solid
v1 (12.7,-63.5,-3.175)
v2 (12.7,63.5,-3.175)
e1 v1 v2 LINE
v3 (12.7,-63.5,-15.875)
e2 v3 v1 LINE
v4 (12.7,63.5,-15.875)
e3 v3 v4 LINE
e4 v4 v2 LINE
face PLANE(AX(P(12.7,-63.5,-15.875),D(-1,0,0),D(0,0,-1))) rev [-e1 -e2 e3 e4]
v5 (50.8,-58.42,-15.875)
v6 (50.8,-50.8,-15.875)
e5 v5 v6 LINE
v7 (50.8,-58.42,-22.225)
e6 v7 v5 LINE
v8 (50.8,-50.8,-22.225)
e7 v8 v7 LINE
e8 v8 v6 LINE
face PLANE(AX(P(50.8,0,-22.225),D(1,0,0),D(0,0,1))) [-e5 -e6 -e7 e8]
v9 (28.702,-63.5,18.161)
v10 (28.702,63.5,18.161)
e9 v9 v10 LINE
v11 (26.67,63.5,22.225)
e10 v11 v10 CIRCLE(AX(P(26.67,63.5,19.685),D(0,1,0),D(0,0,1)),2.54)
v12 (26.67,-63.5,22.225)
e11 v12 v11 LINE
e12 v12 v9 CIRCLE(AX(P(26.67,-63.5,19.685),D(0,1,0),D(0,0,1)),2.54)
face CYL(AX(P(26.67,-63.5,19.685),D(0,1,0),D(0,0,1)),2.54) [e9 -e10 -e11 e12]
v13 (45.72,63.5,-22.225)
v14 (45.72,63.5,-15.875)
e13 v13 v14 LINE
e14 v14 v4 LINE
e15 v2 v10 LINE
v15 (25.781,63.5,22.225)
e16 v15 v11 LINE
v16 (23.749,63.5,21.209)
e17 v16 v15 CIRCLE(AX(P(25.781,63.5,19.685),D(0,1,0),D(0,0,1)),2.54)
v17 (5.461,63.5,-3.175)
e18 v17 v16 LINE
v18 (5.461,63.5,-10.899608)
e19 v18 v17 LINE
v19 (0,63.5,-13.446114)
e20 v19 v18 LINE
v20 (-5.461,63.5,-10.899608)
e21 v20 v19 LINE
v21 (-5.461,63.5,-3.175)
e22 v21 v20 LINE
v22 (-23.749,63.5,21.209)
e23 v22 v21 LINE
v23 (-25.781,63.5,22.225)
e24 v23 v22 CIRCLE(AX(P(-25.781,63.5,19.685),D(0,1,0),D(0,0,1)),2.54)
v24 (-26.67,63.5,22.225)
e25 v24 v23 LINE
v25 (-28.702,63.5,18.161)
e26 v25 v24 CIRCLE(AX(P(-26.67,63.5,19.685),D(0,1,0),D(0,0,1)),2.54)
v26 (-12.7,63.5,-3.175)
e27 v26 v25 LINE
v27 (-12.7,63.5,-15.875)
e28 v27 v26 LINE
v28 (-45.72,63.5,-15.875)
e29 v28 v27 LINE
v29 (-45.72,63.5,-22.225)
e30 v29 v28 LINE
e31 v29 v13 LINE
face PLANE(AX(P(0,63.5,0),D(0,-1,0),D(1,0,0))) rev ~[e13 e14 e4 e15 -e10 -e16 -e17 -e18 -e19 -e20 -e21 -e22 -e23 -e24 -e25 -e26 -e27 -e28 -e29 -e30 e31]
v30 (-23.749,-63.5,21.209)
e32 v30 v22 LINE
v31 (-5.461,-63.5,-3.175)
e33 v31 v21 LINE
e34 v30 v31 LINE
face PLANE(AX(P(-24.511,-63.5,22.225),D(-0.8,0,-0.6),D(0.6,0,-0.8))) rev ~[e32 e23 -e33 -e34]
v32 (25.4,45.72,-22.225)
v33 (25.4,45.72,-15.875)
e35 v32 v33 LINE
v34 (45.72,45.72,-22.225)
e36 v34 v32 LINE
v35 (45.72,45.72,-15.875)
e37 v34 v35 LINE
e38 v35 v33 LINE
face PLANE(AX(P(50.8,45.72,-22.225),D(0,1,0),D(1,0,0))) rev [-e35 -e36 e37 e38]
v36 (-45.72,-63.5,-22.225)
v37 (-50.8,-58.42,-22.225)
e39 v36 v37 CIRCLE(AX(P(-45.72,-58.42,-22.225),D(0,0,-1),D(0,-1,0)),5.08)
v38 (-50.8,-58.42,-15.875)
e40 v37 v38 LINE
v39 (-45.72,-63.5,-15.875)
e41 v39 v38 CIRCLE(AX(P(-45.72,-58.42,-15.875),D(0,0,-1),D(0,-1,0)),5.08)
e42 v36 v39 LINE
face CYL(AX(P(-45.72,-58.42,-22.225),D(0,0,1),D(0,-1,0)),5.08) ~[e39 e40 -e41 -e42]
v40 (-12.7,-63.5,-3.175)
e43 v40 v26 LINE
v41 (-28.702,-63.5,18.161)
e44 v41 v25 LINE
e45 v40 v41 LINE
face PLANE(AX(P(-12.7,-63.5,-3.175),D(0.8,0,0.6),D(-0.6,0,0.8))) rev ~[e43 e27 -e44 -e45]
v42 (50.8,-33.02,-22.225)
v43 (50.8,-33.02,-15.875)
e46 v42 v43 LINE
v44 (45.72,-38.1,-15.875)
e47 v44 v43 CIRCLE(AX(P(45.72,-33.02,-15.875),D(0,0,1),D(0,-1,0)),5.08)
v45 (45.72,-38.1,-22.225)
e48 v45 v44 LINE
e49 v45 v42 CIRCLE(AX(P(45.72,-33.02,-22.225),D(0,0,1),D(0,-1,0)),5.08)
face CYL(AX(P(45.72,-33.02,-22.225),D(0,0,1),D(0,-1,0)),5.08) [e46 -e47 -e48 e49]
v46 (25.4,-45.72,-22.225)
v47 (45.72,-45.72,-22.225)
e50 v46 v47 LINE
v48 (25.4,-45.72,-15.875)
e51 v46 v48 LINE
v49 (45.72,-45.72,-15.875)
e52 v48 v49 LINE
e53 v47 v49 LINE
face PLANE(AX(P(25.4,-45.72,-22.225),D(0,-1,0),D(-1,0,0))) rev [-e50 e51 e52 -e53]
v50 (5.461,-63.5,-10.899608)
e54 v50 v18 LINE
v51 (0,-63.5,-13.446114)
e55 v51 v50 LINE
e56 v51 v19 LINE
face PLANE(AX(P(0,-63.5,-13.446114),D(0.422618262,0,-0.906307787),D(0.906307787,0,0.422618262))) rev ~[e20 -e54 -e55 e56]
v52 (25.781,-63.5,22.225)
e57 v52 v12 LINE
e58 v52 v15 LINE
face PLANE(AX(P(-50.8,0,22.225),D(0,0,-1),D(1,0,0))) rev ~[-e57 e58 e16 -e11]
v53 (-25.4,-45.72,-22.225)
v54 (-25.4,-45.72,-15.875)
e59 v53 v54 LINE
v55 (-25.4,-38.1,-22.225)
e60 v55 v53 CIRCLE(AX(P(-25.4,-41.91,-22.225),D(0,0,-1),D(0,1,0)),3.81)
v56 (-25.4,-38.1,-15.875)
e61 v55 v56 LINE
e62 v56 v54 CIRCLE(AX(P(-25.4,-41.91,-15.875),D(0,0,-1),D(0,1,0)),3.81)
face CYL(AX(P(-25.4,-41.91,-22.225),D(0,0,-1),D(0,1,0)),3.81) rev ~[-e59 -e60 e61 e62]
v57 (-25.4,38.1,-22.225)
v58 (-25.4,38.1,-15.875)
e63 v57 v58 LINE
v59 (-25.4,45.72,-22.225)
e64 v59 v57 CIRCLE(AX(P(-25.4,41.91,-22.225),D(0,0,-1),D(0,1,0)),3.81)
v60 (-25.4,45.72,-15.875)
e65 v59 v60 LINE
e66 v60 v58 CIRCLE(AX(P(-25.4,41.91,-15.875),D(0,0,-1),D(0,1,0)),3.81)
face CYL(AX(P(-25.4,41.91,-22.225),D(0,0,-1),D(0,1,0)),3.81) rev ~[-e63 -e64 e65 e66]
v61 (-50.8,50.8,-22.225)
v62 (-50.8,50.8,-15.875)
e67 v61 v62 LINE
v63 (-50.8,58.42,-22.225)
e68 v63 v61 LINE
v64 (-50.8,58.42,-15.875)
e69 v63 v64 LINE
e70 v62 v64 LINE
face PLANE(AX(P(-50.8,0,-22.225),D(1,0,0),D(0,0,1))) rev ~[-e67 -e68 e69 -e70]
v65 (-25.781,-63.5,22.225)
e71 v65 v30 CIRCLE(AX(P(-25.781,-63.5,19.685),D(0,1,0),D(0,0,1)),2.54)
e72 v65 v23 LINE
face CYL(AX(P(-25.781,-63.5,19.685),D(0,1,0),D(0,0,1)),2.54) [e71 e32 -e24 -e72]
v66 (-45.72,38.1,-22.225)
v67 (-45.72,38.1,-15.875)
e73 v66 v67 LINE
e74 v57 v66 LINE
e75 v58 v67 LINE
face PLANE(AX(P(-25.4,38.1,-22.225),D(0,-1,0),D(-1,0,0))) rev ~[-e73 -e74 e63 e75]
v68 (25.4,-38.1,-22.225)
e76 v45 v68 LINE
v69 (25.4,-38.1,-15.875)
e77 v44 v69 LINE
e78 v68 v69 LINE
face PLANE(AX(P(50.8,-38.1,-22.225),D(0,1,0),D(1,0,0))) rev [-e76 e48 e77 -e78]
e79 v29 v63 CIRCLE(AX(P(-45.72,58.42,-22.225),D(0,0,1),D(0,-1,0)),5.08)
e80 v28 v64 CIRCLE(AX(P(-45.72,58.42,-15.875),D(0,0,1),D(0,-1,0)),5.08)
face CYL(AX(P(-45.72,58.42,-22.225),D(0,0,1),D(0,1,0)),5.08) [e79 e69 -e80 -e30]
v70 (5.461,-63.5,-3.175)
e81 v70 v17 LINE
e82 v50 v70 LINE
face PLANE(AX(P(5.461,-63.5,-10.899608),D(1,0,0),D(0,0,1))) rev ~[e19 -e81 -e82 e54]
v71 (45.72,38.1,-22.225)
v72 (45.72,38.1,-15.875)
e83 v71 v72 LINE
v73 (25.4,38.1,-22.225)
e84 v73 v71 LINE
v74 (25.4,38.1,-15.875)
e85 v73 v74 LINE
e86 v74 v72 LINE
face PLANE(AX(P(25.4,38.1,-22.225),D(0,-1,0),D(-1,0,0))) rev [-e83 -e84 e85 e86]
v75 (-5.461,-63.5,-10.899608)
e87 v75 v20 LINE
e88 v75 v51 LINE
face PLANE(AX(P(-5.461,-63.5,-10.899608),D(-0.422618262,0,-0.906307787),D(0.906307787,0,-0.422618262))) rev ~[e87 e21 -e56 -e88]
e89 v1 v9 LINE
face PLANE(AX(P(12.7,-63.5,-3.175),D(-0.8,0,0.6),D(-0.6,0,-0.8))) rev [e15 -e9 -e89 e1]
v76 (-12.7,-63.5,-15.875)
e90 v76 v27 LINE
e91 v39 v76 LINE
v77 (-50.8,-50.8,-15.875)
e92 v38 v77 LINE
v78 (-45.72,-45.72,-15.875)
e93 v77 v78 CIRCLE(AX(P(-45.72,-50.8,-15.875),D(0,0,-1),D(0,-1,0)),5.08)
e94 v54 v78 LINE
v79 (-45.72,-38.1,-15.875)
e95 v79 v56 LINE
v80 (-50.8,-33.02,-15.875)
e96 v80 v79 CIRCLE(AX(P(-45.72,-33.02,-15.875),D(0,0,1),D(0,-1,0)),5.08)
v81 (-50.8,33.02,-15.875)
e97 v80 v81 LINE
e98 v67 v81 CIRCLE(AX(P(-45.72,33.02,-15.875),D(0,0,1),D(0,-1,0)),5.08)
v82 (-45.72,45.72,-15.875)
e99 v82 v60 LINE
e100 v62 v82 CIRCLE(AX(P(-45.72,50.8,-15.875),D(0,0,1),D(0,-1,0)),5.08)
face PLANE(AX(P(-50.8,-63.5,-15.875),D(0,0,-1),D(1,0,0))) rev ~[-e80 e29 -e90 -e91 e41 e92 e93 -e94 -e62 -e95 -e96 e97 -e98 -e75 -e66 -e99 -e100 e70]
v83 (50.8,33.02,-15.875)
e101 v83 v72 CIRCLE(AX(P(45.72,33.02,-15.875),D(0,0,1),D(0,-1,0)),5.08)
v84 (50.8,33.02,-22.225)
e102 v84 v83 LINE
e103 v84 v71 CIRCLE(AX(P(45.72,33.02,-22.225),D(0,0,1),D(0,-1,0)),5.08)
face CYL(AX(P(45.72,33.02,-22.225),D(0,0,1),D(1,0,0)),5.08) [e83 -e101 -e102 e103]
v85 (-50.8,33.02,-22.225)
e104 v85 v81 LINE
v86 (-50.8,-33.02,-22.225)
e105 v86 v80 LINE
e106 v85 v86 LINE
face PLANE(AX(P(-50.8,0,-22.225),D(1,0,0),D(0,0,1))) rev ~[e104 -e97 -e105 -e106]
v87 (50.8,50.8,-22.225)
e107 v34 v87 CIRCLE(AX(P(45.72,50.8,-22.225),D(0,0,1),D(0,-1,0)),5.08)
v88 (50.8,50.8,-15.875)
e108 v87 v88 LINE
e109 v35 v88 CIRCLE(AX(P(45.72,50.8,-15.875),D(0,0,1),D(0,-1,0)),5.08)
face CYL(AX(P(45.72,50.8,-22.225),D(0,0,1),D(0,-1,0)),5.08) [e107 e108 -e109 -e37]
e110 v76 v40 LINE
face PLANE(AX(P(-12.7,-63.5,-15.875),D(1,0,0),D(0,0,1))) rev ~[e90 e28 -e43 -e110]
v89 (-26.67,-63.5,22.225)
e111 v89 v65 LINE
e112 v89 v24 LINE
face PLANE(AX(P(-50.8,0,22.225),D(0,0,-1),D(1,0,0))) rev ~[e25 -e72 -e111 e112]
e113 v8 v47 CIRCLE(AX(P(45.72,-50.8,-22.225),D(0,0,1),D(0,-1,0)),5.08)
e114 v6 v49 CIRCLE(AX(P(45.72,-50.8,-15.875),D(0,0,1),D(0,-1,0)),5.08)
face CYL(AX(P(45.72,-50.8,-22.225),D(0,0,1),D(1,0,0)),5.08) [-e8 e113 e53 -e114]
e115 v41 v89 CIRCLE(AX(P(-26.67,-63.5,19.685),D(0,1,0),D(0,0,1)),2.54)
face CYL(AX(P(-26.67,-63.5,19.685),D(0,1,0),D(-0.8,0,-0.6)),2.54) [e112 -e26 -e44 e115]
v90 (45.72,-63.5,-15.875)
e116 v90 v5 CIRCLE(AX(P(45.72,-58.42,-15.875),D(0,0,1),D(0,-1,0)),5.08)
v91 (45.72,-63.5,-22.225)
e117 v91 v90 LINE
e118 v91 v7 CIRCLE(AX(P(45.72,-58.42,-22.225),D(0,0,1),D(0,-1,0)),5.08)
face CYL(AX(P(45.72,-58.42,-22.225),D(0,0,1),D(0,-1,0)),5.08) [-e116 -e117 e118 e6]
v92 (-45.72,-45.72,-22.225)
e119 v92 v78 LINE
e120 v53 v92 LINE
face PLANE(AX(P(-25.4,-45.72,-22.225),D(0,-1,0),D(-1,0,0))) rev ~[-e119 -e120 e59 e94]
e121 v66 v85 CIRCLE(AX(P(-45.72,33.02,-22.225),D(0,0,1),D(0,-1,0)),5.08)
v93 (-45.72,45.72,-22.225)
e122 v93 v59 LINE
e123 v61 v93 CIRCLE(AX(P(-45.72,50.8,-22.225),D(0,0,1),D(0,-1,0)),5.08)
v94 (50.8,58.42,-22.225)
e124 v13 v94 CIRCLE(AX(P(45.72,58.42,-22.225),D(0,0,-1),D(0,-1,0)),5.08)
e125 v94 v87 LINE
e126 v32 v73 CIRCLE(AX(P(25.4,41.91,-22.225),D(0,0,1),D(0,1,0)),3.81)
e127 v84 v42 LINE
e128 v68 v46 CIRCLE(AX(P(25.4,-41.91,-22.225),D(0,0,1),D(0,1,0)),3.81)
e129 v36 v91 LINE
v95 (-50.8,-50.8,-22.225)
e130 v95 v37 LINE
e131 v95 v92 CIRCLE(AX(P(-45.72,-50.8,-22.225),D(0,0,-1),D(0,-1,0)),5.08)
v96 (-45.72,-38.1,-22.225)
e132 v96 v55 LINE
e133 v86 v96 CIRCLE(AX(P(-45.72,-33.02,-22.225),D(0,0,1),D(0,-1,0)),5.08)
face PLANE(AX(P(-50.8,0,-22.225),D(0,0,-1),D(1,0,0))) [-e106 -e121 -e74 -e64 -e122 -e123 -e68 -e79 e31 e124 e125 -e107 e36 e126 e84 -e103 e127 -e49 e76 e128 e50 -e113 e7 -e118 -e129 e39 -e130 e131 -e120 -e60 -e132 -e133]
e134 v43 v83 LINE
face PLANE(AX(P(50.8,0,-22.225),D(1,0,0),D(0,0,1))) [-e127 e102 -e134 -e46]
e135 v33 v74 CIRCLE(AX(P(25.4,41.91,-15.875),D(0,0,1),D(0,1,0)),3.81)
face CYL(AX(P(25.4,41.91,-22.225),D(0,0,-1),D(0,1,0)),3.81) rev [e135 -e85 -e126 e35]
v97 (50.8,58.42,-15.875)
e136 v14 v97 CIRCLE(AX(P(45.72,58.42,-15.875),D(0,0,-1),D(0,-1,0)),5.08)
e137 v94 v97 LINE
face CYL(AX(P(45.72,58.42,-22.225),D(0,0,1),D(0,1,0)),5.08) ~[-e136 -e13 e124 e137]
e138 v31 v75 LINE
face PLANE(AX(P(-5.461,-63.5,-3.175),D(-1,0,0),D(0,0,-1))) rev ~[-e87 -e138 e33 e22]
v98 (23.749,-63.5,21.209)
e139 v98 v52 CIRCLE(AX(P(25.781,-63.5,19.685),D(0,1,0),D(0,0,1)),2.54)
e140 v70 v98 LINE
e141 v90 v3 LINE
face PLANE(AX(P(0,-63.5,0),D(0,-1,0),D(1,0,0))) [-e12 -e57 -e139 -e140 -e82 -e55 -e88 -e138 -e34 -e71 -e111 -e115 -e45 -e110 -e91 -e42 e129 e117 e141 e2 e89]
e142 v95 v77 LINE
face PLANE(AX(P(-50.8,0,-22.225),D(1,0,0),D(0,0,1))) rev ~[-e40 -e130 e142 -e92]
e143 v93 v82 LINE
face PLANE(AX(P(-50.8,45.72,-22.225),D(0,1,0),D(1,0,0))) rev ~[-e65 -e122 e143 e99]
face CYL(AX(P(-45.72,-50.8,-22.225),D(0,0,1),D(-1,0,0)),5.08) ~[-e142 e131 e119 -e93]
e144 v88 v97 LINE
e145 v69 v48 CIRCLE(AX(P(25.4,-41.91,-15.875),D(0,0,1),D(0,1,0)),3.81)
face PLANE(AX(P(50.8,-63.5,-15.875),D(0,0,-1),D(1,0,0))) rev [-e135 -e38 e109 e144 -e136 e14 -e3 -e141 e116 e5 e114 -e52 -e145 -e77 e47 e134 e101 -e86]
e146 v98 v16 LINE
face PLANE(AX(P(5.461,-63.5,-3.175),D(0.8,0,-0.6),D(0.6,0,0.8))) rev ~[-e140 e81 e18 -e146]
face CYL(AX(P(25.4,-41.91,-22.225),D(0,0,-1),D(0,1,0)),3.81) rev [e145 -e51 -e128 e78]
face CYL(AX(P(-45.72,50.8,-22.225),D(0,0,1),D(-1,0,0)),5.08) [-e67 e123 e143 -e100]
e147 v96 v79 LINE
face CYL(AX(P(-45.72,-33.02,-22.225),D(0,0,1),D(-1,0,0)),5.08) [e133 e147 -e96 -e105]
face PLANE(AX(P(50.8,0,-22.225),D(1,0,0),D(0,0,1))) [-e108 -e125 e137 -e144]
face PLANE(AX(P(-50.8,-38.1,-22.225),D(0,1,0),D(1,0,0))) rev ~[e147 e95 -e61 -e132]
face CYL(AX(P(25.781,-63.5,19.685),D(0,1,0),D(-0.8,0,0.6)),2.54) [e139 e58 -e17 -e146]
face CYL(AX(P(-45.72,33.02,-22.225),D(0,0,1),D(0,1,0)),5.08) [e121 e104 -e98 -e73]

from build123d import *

# Parameters (mm, degrees)
F0_W     = 101.6
F0_H     = 44.45
F1_DEPTH = 63.5
F3_DEPTH = 127.001
F5_DEPTH = 127.001
F6_R     = 2.54
F8_DEPTH = 6.35
F9_R     = 5.08


# Not quite as in the source:
# - a pattern or mirror of a feature is missing from the dataset's text; its kind, count and spacing are read off the source's solid


with BuildPart() as f1:
    # F0 (on Front) → F1 (new body, symmetric)
    with BuildSketch(Plane.XZ):
        Rectangle(F0_W, F0_H)
    extrude(amount=F1_DEPTH, both=True)

    # F2 (on face) → F3 (cut, through all)
    with BuildSketch(Plane.XZ.offset(63.5)):
        Polygon((-50.8, -15.875), (-12.7, -15.875), (-12.7, -3.175), (-31.75, 22.225), (-50.8, 22.225), align=None)
    f3 = extrude(amount=-F3_DEPTH, mode=Mode.SUBTRACT)

    # F3_copies: F3 across plane
    add(f3.mirror(Plane(origin=(0, 0, 0), x_dir=(0, 0, 1), z_dir=(1, 0, 0))), mode=Mode.SUBTRACT)

    # F4 (on face) → F5 (cut, through all)
    with BuildSketch(Plane.XZ.offset(63.5)):
        Polygon((24.511, 22.225), (-24.511, 22.225), (-5.461, -3.175), (-5.461, -10.8996083293), (0, -13.4461144505), (5.461, -10.8996083293), (5.461, -3.175), align=None)
    extrude(amount=-F5_DEPTH, mode=Mode.SUBTRACT)

    # F6
    f6_edges = [f1.edges().sort_by_distance(p)[0] for p in [
        (-31.75, 0, 22.225),
        (-24.511, 0, 22.225),
        (24.511, 0, 22.225),
        (31.75, 0, 22.225),
    ]]
    fillet(f6_edges, radius=F6_R)

    # F7 (on face) → F8 (cut, through all)
    with BuildSketch(Plane(origin=(0, 0, -22.225), x_dir=(1, 0, 0), z_dir=(0, 0, -1))):
        with BuildLine():
            Line((-25.4, 45.72), (-50.8, 45.72))
            Line((-50.8, 45.72), (-50.8, 38.1))
            Line((-50.8, 38.1), (-25.4, 38.1))
            ThreePointArc((-25.4, 38.1), (-21.59, 41.91), (-25.4, 45.72))
        make_face()
        with BuildLine():
            Line((-25.4, -38.1), (-50.8, -38.1))
            Line((-50.8, -38.1), (-50.8, -45.72))
            Line((-50.8, -45.72), (-25.4, -45.72))
            ThreePointArc((-25.4, -45.72), (-21.59, -41.91), (-25.4, -38.1))
        make_face()
    f8 = extrude(amount=-F8_DEPTH, mode=Mode.SUBTRACT)

    # F8_copies: F8 across plane
    add(f8.mirror(Plane(origin=(0, 0, 0), x_dir=(0, 0, 1), z_dir=(1, 0, 0))), mode=Mode.SUBTRACT)

    # F9
    f9_edges = [f1.edges().sort_by_distance(p)[0] for p in [
        (-50.8, -63.5, -19.05),
        (-50.8, 63.5, -19.05),
        (50.8, -63.5, -19.05),
        (50.8, 63.5, -19.05),
        (-50.8, -45.72, -19.05),
        (-50.8, 38.1, -19.05),
        (-50.8, 45.72, -19.05),
        (-50.8, -38.1, -19.05),
        (50.8, 45.72, -19.05),
        (50.8, -45.72, -19.05),
        (50.8, -38.1, -19.05),
        (50.8, 38.1, -19.05),
    ]]
    fillet(f9_edges, radius=F9_R)


solid = f1.part
